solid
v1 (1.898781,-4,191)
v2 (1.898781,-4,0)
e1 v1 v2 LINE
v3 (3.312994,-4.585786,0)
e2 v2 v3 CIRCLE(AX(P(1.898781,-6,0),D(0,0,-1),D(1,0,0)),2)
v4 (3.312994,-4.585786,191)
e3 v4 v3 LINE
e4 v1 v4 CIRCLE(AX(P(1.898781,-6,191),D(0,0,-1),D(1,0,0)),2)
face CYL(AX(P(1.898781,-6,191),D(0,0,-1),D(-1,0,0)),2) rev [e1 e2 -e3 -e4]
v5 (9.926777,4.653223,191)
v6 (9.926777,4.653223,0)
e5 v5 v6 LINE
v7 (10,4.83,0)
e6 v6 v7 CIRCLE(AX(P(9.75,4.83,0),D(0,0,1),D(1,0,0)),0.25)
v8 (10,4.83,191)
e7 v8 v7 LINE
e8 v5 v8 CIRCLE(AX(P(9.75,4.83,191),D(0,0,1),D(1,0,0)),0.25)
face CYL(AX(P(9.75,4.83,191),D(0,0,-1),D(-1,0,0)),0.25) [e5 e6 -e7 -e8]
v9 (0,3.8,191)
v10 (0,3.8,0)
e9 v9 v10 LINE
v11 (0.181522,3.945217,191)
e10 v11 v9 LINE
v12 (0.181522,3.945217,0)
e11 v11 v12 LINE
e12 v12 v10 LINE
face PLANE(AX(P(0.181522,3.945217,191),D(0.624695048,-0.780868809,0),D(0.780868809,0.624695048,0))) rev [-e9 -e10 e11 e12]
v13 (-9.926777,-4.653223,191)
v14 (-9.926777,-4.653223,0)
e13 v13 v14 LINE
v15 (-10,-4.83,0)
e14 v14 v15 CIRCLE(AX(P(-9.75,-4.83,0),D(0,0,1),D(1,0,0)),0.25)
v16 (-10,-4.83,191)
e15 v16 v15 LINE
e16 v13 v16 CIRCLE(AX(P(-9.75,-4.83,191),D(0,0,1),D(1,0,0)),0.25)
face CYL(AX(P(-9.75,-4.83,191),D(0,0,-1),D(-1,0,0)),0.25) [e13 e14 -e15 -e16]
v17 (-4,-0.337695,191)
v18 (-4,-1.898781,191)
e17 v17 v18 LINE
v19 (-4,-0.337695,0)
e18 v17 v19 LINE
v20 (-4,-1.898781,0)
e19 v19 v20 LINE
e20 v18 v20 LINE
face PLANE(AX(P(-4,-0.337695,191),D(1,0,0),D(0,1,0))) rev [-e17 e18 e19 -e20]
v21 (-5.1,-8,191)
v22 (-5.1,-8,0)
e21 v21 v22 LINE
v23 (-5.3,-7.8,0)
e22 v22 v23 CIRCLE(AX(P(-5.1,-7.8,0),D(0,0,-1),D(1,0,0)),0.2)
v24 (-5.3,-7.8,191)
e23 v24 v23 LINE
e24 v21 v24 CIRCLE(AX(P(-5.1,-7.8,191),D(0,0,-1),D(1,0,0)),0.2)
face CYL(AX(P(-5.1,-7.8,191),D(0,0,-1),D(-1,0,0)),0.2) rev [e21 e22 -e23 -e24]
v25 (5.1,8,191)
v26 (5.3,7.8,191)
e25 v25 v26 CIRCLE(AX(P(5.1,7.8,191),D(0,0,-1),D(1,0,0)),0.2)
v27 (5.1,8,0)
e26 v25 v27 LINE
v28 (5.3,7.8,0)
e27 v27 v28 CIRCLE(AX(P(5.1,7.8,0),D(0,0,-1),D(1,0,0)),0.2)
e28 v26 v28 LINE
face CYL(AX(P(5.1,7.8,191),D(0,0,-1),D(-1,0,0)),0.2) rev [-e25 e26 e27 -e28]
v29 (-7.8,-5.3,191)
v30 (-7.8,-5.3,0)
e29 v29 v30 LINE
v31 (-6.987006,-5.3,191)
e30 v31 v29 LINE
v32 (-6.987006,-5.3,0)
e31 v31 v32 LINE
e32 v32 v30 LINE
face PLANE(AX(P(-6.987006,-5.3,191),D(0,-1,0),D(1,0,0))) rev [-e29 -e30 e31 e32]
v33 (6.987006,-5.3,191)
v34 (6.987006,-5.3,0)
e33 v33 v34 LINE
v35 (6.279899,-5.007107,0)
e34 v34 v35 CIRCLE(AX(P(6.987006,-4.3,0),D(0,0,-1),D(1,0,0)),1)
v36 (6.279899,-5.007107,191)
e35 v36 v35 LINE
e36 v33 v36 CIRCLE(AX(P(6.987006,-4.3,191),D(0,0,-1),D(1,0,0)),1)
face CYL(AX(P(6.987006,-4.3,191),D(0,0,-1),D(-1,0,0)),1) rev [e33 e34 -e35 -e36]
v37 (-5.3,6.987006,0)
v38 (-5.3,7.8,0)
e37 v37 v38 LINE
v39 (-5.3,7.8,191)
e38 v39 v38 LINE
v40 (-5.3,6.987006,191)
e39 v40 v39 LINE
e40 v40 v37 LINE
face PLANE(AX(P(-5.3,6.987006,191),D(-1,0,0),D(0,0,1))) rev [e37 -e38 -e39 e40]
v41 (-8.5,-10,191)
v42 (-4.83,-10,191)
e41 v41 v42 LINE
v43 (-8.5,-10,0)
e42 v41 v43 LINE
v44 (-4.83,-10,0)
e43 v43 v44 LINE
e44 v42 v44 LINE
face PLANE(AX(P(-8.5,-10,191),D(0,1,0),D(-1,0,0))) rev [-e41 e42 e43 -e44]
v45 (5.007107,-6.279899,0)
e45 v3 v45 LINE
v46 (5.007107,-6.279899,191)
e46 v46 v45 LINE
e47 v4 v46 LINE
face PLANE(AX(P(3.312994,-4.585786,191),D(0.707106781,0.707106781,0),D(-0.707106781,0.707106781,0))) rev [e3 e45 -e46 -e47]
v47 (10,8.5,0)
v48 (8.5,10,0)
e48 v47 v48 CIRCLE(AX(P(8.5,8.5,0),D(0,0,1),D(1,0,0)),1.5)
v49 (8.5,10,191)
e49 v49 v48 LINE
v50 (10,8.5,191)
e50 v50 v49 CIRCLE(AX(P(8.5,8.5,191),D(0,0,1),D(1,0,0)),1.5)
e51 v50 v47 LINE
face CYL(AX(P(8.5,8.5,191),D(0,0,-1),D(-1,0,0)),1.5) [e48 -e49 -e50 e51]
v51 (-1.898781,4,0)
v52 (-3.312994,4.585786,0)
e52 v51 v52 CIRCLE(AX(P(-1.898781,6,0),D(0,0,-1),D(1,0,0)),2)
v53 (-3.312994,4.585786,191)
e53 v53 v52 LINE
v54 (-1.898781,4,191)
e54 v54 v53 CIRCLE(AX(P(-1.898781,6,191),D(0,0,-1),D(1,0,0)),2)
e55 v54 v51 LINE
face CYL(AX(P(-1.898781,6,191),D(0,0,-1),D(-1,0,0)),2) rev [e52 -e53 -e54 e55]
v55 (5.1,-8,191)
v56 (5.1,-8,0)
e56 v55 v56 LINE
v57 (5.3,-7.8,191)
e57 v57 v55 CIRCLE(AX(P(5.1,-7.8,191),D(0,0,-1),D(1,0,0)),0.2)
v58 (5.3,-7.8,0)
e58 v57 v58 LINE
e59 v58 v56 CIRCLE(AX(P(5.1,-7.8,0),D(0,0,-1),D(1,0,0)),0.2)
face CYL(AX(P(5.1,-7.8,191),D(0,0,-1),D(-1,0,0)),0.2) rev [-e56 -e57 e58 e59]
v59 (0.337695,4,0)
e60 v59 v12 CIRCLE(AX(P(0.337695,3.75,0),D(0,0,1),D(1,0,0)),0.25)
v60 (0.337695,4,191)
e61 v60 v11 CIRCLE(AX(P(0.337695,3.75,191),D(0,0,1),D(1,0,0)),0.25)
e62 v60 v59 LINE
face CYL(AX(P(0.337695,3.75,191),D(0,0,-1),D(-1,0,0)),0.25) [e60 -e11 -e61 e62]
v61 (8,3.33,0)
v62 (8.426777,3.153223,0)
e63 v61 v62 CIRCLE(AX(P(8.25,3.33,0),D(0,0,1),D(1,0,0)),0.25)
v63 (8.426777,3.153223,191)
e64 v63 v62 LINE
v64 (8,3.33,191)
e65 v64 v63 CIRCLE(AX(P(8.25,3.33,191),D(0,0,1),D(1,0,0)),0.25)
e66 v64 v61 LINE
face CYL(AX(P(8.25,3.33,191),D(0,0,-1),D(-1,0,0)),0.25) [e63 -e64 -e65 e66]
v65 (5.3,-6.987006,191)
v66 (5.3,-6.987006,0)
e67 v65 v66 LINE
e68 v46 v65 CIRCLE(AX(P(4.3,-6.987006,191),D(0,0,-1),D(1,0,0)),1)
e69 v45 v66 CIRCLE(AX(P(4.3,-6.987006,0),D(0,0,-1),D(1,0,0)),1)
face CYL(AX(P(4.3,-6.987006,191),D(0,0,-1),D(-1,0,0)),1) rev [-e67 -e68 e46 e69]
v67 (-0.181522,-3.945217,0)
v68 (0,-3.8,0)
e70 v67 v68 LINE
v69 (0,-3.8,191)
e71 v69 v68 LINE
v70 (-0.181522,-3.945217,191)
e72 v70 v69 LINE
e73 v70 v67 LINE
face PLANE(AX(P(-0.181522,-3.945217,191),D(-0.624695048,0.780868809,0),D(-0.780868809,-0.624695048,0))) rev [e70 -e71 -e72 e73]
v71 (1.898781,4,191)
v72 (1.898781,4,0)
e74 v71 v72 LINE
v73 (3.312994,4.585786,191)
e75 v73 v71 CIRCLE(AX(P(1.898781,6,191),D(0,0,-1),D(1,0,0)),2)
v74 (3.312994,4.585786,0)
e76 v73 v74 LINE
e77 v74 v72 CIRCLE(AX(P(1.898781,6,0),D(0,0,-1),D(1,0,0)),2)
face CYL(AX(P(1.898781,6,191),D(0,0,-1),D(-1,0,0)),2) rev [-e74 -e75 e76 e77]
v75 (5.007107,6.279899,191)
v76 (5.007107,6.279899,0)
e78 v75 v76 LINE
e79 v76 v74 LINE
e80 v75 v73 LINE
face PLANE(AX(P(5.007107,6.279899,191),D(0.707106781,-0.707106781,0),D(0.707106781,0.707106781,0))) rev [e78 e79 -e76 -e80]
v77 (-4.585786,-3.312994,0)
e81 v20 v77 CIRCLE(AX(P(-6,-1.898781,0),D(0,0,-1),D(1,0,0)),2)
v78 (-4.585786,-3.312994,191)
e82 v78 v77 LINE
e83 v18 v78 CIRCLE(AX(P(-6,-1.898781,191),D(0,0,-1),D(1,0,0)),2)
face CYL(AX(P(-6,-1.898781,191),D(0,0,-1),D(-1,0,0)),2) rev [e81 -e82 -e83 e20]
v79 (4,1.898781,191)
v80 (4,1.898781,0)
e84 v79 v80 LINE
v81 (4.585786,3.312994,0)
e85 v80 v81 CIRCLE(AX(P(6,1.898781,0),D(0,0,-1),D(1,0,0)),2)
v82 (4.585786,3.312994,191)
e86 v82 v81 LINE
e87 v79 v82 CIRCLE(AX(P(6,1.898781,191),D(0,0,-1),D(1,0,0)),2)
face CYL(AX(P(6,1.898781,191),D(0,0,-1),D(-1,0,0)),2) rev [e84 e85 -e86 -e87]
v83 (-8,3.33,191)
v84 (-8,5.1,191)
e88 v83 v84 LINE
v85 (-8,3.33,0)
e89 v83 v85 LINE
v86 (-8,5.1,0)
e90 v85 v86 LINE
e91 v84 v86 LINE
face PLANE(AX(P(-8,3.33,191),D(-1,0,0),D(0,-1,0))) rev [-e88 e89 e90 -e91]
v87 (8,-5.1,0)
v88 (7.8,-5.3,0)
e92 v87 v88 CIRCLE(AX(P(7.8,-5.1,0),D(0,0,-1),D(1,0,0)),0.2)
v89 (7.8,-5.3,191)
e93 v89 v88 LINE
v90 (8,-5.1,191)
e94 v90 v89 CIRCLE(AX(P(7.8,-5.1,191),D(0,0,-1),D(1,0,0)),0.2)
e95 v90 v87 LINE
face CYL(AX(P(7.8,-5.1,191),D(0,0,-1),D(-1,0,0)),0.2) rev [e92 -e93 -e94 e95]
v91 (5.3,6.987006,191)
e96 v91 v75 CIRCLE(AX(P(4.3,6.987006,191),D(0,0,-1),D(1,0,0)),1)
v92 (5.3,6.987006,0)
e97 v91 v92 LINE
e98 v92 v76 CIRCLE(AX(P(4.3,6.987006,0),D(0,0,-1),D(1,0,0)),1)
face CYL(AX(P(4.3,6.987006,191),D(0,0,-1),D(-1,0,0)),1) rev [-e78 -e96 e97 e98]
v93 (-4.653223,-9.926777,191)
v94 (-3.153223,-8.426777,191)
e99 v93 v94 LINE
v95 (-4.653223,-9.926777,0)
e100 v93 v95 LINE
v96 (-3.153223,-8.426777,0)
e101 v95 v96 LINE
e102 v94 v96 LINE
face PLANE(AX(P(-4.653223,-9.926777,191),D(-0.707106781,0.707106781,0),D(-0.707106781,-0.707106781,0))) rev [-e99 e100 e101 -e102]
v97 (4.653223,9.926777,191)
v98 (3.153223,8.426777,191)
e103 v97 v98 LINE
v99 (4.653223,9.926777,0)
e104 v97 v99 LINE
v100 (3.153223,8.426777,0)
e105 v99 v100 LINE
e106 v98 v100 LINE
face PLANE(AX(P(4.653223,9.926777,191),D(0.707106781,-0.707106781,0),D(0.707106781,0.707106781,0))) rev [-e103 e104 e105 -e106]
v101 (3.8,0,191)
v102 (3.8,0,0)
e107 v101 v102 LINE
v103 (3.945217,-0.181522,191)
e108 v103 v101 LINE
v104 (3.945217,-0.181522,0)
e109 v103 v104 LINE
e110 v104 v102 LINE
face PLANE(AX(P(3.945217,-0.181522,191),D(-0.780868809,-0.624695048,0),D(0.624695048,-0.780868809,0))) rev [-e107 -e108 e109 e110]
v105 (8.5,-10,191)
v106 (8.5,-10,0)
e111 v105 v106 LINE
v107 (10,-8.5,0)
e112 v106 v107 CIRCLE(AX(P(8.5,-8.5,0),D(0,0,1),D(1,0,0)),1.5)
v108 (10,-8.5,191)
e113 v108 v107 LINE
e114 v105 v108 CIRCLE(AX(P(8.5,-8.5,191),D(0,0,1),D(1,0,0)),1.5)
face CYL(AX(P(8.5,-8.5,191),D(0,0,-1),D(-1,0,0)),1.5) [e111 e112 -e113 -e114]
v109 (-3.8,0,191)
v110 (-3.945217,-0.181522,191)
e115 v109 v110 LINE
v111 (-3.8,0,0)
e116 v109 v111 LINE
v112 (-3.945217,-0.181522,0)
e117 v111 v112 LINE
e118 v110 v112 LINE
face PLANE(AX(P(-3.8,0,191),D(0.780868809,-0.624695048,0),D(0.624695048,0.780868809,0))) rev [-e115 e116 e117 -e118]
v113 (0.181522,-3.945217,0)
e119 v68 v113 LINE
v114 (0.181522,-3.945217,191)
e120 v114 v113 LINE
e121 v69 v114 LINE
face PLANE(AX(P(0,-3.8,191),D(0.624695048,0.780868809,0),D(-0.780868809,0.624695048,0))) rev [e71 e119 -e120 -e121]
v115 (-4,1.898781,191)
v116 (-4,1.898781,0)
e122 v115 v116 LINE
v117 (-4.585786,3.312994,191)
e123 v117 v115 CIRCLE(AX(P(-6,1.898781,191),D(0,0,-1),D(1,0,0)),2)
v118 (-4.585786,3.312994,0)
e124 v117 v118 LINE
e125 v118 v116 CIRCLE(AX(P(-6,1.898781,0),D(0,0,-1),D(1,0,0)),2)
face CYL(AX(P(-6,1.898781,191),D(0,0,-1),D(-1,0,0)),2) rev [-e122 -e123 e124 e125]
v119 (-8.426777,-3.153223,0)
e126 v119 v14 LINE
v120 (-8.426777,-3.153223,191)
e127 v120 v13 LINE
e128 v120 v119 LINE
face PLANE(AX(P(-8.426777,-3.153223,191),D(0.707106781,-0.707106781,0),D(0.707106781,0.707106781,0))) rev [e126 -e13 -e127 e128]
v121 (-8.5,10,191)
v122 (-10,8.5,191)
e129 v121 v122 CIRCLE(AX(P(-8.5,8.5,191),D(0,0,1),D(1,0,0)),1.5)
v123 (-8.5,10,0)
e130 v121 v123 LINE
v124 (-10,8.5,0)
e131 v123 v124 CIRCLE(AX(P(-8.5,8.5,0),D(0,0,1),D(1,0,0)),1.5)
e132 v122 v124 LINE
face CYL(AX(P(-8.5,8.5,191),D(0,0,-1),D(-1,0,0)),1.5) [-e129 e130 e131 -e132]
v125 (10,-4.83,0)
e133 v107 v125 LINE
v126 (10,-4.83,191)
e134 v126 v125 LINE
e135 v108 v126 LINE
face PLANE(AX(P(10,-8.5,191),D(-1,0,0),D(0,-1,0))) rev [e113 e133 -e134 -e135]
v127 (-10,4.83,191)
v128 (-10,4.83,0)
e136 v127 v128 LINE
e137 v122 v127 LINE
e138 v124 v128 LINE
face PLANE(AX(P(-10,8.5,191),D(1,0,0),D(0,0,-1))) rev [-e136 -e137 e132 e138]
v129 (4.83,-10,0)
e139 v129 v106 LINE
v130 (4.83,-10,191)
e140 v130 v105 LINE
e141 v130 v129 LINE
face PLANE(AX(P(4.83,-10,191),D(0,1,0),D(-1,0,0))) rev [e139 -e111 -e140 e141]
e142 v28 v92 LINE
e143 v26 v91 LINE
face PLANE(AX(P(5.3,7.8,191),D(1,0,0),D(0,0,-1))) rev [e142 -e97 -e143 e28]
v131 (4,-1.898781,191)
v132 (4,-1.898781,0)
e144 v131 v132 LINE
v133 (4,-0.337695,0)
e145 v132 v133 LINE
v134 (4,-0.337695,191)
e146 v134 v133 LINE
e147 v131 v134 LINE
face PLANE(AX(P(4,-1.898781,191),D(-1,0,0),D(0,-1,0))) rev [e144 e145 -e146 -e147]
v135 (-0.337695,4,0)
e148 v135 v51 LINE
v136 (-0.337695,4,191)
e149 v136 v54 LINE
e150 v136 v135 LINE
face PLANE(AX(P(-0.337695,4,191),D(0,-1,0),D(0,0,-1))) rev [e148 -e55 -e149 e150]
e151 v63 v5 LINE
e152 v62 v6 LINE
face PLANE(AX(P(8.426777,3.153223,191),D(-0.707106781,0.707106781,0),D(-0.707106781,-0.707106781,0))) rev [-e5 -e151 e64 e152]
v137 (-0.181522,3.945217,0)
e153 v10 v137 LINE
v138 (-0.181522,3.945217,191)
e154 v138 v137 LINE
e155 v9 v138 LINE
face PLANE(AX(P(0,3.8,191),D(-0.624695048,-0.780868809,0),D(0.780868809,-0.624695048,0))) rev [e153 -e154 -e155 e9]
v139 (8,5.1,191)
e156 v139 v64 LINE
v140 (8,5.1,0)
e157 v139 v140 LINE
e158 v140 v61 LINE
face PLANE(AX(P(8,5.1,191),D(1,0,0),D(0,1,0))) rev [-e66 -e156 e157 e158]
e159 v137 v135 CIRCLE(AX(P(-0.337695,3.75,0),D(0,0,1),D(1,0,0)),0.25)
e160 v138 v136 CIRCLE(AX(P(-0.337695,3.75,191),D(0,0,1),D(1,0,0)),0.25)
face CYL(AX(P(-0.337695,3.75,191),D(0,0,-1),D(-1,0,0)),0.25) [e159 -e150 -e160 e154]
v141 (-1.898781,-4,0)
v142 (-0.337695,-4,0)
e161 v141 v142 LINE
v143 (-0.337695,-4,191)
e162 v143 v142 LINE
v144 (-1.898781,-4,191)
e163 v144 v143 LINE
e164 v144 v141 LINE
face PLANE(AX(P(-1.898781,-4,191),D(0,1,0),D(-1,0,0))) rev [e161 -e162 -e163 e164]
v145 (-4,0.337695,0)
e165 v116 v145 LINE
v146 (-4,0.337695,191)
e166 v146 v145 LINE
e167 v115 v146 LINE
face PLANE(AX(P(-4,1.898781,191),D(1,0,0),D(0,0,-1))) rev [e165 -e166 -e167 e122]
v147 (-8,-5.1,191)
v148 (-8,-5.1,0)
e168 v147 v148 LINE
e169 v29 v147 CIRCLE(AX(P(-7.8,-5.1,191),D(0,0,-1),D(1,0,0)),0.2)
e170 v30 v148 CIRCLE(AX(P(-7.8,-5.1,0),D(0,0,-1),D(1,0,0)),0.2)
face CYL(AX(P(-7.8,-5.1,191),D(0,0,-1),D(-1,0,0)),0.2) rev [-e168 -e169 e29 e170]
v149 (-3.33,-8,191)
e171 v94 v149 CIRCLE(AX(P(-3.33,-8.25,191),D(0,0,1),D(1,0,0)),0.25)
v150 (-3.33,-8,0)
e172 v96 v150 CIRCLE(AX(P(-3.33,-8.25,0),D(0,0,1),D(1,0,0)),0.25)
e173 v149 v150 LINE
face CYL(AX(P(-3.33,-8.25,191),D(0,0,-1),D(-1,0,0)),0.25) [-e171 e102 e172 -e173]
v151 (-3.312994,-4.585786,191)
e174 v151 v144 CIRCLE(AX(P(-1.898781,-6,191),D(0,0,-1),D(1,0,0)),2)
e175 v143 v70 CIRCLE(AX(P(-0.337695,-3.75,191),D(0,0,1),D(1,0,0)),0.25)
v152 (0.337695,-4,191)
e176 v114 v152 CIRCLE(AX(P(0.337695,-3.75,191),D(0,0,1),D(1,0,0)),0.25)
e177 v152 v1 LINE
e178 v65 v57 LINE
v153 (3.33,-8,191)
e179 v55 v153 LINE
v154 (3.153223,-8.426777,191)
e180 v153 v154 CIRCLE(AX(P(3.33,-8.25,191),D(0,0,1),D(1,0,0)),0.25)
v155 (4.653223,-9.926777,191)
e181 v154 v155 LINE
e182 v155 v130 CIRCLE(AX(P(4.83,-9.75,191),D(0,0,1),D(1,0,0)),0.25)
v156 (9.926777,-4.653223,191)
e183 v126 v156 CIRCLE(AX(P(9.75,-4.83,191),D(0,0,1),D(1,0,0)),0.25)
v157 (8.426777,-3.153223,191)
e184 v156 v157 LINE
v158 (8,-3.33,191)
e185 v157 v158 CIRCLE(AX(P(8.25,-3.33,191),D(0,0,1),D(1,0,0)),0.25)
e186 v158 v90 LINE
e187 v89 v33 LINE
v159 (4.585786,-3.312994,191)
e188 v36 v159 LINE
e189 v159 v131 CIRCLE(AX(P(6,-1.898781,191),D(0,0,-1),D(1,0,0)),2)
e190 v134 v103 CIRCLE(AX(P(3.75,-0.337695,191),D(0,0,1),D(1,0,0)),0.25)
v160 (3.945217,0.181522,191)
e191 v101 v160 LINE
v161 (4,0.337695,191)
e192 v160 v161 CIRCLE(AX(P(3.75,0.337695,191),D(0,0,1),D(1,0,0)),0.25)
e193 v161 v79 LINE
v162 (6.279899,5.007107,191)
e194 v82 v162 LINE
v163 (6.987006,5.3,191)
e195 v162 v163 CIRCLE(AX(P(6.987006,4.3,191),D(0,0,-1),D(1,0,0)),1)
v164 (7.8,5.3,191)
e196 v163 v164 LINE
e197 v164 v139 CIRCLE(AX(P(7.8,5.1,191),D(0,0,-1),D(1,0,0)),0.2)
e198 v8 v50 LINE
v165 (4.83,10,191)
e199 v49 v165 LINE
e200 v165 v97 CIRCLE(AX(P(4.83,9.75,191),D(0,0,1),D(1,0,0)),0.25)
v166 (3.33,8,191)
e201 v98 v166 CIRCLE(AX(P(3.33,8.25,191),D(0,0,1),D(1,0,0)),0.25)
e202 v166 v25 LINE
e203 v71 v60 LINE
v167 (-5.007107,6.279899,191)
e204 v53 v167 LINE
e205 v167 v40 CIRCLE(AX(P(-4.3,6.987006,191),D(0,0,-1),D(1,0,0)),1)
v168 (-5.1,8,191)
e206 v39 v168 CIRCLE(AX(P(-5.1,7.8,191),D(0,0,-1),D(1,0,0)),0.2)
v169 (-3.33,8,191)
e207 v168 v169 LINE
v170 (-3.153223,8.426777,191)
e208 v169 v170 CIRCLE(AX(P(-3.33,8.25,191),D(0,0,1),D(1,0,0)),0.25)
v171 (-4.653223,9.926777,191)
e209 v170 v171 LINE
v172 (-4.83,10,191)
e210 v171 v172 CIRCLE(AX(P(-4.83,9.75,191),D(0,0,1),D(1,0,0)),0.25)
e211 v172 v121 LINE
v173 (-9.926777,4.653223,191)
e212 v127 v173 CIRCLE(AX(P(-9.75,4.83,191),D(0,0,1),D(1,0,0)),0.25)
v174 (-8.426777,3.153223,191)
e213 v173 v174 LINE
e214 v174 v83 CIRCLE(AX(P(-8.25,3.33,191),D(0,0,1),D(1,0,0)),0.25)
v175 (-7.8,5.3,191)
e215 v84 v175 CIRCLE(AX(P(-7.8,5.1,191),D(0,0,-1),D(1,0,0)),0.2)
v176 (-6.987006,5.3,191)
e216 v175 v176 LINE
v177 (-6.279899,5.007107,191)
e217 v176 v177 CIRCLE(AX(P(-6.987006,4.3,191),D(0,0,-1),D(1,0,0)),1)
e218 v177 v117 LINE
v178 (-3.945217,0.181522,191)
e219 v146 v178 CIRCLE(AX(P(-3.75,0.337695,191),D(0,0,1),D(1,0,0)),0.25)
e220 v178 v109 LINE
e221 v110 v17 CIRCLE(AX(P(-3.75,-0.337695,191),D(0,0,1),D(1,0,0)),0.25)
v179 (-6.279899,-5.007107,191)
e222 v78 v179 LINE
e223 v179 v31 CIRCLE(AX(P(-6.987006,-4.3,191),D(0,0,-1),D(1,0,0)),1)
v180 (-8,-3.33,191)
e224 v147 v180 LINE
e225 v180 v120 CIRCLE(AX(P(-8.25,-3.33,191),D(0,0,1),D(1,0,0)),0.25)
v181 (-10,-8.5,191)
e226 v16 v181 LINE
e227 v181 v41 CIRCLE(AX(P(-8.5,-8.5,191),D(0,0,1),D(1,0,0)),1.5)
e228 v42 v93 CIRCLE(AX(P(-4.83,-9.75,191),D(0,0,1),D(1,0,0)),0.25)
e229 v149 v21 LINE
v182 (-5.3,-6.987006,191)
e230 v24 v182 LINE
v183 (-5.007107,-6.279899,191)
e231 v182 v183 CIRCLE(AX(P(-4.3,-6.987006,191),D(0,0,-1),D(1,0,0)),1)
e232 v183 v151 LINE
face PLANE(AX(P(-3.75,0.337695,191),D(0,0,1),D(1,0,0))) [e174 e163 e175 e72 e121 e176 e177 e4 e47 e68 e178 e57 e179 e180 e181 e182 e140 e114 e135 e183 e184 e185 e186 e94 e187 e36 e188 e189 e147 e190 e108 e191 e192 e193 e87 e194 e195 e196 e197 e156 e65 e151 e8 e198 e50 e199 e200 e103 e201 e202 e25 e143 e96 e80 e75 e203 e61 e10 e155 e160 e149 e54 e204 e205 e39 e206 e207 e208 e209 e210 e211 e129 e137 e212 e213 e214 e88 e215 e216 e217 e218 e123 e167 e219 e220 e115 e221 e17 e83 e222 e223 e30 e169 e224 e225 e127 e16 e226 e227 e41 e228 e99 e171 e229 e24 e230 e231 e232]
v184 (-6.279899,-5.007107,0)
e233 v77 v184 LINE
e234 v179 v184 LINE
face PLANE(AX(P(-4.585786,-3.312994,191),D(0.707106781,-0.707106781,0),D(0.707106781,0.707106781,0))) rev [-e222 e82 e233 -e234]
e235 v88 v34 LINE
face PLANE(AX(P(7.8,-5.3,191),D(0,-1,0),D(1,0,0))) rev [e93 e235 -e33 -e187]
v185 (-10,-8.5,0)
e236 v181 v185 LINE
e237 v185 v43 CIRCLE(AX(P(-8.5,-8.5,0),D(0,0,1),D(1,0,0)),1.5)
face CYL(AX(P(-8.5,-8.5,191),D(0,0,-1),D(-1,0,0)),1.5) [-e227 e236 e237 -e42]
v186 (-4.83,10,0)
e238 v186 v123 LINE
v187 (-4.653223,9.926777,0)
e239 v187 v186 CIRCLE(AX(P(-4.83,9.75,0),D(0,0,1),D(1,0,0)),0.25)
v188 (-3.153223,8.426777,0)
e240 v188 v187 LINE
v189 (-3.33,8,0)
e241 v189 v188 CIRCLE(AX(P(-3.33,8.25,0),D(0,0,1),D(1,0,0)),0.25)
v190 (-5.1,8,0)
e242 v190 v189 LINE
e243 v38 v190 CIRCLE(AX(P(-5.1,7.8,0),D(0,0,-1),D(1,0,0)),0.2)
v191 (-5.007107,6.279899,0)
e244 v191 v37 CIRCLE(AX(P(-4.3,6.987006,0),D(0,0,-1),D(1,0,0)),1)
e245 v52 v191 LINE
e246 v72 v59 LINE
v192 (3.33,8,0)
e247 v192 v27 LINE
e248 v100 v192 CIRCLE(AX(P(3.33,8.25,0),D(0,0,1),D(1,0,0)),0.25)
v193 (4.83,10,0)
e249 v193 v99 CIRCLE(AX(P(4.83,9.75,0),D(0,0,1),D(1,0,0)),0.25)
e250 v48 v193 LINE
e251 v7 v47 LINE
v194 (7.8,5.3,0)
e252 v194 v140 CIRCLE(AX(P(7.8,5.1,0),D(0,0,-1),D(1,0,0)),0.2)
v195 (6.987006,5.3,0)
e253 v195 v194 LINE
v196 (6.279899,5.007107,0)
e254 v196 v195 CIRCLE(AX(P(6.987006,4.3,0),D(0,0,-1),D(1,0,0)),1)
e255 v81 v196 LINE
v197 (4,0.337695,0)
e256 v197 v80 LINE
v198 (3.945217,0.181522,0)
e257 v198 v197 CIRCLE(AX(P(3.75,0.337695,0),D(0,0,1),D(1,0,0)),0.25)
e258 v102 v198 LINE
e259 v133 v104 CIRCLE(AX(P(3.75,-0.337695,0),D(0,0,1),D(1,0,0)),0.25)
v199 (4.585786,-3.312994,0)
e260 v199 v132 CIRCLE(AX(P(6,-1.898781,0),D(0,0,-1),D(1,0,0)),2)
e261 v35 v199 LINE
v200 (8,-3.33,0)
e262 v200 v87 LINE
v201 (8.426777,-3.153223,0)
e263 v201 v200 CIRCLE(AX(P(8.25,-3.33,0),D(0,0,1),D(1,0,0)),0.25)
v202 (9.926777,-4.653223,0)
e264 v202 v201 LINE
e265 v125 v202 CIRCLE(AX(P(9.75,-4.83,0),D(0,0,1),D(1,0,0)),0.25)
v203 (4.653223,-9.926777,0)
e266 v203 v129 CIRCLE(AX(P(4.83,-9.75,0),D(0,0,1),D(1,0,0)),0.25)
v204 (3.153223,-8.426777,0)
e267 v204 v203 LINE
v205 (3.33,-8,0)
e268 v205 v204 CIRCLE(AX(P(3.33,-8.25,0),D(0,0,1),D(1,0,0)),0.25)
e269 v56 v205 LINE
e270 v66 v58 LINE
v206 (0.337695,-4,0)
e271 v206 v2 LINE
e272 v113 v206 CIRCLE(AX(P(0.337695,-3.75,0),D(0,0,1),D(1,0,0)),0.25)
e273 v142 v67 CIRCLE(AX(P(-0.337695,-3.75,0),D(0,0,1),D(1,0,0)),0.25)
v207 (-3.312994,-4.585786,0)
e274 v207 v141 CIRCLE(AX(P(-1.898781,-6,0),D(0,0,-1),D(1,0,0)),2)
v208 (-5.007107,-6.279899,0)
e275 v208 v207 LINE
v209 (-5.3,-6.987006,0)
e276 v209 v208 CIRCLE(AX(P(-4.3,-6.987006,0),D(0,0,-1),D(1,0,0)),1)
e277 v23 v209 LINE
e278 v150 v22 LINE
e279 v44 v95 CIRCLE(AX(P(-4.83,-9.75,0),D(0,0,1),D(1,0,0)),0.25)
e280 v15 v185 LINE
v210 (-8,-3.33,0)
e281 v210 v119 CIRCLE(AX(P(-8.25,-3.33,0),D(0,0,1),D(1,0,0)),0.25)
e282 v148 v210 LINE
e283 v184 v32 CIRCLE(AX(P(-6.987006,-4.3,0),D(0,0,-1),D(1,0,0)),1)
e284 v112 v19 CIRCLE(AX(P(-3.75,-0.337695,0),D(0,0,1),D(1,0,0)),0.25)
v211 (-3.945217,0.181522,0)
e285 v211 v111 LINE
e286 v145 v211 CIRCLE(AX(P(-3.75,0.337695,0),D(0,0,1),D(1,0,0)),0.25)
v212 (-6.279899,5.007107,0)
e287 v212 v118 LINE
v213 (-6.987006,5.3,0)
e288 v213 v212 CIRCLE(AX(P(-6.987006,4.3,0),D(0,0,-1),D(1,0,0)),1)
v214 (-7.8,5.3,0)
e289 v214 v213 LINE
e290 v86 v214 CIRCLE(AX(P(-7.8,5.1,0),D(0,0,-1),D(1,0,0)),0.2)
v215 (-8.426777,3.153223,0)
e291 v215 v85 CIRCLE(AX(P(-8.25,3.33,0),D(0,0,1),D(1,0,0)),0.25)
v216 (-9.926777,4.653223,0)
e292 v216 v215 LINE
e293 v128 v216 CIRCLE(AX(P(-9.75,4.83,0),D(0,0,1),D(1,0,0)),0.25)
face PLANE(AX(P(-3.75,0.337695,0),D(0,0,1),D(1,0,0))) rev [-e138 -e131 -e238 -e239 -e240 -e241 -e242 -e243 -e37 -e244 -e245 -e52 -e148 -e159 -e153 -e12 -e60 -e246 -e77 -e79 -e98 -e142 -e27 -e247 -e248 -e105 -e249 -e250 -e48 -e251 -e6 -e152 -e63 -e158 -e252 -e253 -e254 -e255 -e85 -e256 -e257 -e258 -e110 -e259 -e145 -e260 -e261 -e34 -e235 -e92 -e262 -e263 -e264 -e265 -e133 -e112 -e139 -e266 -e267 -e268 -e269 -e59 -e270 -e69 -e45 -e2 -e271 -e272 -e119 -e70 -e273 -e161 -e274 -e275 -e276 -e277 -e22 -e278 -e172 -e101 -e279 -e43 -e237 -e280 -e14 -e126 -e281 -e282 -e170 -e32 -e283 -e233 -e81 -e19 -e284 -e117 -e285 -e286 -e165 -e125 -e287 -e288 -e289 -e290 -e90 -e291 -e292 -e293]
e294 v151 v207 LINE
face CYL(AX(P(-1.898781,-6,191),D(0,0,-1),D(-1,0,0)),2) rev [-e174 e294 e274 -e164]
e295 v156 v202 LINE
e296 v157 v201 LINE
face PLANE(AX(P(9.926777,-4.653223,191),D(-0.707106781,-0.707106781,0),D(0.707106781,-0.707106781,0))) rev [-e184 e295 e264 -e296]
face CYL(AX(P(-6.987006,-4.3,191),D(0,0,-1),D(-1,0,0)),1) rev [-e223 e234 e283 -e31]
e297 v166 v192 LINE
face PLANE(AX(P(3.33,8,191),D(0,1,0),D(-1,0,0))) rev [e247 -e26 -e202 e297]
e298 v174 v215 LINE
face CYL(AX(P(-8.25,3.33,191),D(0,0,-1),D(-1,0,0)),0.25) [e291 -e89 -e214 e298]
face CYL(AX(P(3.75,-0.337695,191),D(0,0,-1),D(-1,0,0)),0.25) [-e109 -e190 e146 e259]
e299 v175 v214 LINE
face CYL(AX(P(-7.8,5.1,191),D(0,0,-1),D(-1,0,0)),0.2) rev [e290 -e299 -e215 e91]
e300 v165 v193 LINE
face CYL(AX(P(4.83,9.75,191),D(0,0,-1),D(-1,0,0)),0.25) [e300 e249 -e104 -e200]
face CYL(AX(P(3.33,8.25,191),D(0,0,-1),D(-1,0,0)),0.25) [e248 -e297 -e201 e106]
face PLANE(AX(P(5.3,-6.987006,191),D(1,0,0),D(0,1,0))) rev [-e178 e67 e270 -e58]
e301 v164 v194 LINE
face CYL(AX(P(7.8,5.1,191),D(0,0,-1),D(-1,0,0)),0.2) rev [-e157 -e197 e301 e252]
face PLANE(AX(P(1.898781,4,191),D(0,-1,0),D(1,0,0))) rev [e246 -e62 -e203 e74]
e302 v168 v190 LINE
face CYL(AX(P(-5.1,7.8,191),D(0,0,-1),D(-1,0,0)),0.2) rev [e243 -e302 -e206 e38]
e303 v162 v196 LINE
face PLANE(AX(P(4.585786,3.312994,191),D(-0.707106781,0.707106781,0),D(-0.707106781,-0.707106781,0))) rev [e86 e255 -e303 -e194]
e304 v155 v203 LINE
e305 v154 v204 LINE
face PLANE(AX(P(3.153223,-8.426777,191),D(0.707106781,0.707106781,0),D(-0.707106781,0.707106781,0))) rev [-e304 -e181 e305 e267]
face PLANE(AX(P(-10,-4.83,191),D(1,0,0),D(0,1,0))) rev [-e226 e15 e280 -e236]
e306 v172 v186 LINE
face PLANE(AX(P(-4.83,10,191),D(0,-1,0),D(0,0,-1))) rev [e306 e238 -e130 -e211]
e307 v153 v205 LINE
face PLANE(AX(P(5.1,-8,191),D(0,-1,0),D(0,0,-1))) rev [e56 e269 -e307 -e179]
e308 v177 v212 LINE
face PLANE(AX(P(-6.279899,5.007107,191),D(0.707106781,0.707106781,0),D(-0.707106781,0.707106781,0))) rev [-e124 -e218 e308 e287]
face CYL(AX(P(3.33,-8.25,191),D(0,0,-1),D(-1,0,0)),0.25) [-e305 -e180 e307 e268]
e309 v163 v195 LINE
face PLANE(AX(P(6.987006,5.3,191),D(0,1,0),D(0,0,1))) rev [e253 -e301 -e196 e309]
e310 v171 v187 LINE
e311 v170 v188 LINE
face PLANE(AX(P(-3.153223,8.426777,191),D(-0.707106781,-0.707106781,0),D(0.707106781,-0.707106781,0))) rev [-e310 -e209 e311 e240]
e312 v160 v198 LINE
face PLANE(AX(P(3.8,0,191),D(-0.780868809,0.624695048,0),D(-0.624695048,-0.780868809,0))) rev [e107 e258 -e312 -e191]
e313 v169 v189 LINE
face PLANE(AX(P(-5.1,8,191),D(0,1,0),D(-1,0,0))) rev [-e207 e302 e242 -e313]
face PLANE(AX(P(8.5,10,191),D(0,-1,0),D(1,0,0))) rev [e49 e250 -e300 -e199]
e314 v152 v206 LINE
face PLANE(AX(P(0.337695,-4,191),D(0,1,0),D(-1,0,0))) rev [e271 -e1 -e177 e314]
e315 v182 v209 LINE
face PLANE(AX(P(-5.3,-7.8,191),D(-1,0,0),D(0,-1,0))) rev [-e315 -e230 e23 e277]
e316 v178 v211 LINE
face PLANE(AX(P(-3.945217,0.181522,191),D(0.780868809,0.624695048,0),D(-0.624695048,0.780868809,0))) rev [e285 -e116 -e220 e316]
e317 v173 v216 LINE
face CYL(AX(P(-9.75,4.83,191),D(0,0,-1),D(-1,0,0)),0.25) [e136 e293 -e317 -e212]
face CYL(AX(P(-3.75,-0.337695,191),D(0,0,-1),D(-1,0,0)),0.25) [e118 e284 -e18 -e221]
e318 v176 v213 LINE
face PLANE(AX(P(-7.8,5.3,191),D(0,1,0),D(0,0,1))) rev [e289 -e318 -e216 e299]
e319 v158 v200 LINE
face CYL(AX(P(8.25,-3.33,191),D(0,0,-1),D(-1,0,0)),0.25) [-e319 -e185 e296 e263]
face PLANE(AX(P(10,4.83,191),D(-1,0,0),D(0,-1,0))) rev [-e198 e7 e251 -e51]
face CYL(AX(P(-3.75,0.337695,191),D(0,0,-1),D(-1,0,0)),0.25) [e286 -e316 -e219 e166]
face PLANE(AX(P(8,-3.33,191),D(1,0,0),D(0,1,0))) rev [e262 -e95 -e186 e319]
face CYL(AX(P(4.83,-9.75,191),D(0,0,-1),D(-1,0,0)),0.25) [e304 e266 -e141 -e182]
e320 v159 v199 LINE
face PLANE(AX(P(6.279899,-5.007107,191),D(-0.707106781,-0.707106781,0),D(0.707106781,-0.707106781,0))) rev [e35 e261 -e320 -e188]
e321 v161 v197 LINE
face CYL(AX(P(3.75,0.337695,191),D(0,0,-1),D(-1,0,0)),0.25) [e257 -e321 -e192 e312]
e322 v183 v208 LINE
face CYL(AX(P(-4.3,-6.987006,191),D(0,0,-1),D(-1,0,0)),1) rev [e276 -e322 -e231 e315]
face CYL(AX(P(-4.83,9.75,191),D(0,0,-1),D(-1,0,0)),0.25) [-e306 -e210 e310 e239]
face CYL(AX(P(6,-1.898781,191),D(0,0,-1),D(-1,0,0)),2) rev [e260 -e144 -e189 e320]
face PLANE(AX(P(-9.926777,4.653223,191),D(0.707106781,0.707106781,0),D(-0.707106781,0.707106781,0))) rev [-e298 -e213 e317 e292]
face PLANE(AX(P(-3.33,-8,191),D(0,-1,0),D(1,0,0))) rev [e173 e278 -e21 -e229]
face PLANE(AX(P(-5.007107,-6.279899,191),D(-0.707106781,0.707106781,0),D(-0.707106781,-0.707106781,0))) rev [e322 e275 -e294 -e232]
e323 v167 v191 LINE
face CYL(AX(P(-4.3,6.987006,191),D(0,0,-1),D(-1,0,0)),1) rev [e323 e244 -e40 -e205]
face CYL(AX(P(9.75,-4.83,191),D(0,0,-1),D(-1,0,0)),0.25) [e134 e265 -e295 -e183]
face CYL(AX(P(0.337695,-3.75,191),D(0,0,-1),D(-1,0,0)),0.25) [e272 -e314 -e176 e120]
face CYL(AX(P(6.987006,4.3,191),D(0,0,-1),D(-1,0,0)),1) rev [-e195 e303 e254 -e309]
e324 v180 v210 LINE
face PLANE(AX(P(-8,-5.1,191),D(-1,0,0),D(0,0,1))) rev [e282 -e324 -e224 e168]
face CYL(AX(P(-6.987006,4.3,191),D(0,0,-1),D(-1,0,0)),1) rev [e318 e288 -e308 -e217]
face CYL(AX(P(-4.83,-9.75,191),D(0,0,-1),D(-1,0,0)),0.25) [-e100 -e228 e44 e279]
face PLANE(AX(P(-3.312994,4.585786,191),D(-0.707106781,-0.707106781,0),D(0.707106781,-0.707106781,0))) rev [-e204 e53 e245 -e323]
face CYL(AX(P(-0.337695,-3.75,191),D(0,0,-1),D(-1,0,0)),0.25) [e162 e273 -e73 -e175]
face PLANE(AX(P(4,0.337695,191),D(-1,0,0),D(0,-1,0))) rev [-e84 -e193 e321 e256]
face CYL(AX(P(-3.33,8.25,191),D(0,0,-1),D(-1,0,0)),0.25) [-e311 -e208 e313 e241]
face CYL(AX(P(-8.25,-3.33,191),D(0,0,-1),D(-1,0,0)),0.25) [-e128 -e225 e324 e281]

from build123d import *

# Parameters (mm, degrees)
EXTRUDE_1_DEPTH = 191


# Read off the part's stored shape, not the designer's step: 222 Конструкционный профиль 20х20-1-surface1
with BuildPart() as part:
    # Эскиз1 → Бобышка-Вытянуть1 (new body)
    with BuildSketch(Plane.XY):
        with BuildLine():
            Line((-3.945217202, 0.181521503), (-3.8, 0))
            Line((-3.8, 0), (-3.945217202, -0.181521503))
            ThreePointArc((-3.945217202, -0.181521503), (-3.98590708, -0.254943529), (-4, -0.337695265))
            Line((-4, -0.337695265), (-4, -1.898780669))
            ThreePointArc((-4, -1.898780669), (-4.152240935, -2.664147534), (-4.585786438, -3.312994231))
            Line((-4.585786438, -3.312994231), (-6.279898987, -5.007106781))
            ThreePointArc((-6.279898987, -5.007106781), (-6.604322336, -5.223879533), (-6.987005769, -5.3))
            Line((-6.987005769, -5.3), (-7.8, -5.3))
            ThreePointArc((-7.8, -5.3), (-7.941421356, -5.241421356), (-8, -5.1))
            Line((-8, -5.1), (-8, -3.33))
            ThreePointArc((-8, -3.33), (-8.154329142, -3.099030117), (-8.426776695, -3.153223305))
            Line((-8.426776695, -3.153223305), (-9.926776695, -4.653223305))
            ThreePointArc((-9.926776695, -4.653223305), (-9.980969883, -4.734329142), (-10, -4.83))
            Line((-10, -4.83), (-10, -8.5))
            ThreePointArc((-10, -8.5), (-9.560660172, -9.560660172), (-8.5, -10))
            Line((-8.5, -10), (-4.83, -10))
            ThreePointArc((-4.83, -10), (-4.734329142, -9.980969883), (-4.653223305, -9.926776695))
            Line((-4.653223305, -9.926776695), (-3.153223305, -8.426776695))
            ThreePointArc((-3.153223305, -8.426776695), (-3.099030117, -8.154329142), (-3.33, -8))
            Line((-3.33, -8), (-5.1, -8))
            ThreePointArc((-5.1, -8), (-5.241421356, -7.941421356), (-5.3, -7.8))
            Line((-5.3, -7.8), (-5.3, -6.987005769))
            ThreePointArc((-5.3, -6.987005769), (-5.223879533, -6.604322336), (-5.007106781, -6.279898987))
            Line((-5.007106781, -6.279898987), (-3.312994231, -4.585786438))
            ThreePointArc((-3.312994231, -4.585786438), (-2.664147534, -4.152240935), (-1.898780669, -4))
            Line((-1.898780669, -4), (-0.337695265, -4))
            ThreePointArc((-0.337695265, -4), (-0.254943529, -3.98590708), (-0.181521503, -3.945217202))
            Line((-0.181521503, -3.945217202), (0, -3.8))
            Line((0, -3.8), (0.181521503, -3.945217202))
            ThreePointArc((0.181521503, -3.945217202), (0.254943529, -3.98590708), (0.337695265, -4))
            Line((0.337695265, -4), (1.898780669, -4))
            ThreePointArc((1.898780669, -4), (2.664147534, -4.152240935), (3.312994231, -4.585786438))
            Line((3.312994231, -4.585786438), (5.007106781, -6.279898987))
            ThreePointArc((5.007106781, -6.279898987), (5.223879533, -6.604322336), (5.3, -6.987005769))
            Line((5.3, -6.987005769), (5.3, -7.8))
            ThreePointArc((5.3, -7.8), (5.241421356, -7.941421356), (5.1, -8))
            Line((5.1, -8), (3.33, -8))
            ThreePointArc((3.33, -8), (3.099030117, -8.154329142), (3.153223305, -8.426776695))
            Line((3.153223305, -8.426776695), (4.653223305, -9.926776695))
            ThreePointArc((4.653223305, -9.926776695), (4.734329142, -9.980969883), (4.83, -10))
            Line((4.83, -10), (8.5, -10))
            ThreePointArc((8.5, -10), (9.560660172, -9.560660172), (10, -8.5))
            Line((10, -8.5), (10, -4.83))
            ThreePointArc((10, -4.83), (9.980969883, -4.734329142), (9.926776695, -4.653223305))
            Line((9.926776695, -4.653223305), (8.426776695, -3.153223305))
            ThreePointArc((8.426776695, -3.153223305), (8.154329142, -3.099030117), (8, -3.33))
            Line((8, -3.33), (8, -5.1))
            ThreePointArc((8, -5.1), (7.941421356, -5.241421356), (7.8, -5.3))
            Line((7.8, -5.3), (6.987005769, -5.3))
            ThreePointArc((6.987005769, -5.3), (6.604322336, -5.223879533), (6.279898987, -5.007106781))
            Line((6.279898987, -5.007106781), (4.585786438, -3.312994231))
            ThreePointArc((4.585786438, -3.312994231), (4.152240935, -2.664147534), (4, -1.898780669))
            Line((4, -1.898780669), (4, -0.337695265))
            ThreePointArc((4, -0.337695265), (3.98590708, -0.254943529), (3.945217202, -0.181521503))
            Line((3.945217202, -0.181521503), (3.8, 0))
            Line((3.8, 0), (3.945217202, 0.181521503))
            ThreePointArc((3.945217202, 0.181521503), (3.98590708, 0.254943529), (4, 0.337695265))
            Line((4, 0.337695265), (4, 1.898780669))
            ThreePointArc((4, 1.898780669), (4.152240935, 2.664147534), (4.585786438, 3.312994231))
            Line((4.585786438, 3.312994231), (6.279898987, 5.007106781))
            ThreePointArc((6.279898987, 5.007106781), (6.604322336, 5.223879533), (6.987005769, 5.3))
            Line((6.987005769, 5.3), (7.8, 5.3))
            ThreePointArc((7.8, 5.3), (7.941421356, 5.241421356), (8, 5.1))
            Line((8, 5.1), (8, 3.33))
            ThreePointArc((8, 3.33), (8.154329142, 3.099030117), (8.426776695, 3.153223305))
            Line((8.426776695, 3.153223305), (9.926776695, 4.653223305))
            ThreePointArc((9.926776695, 4.653223305), (9.980969883, 4.734329142), (10, 4.83))
            Line((10, 4.83), (10, 8.5))
            ThreePointArc((10, 8.5), (9.560660172, 9.560660172), (8.5, 10))
            Line((8.5, 10), (4.83, 10))
            ThreePointArc((4.83, 10), (4.734329142, 9.980969883), (4.653223305, 9.926776695))
            Line((4.653223305, 9.926776695), (3.153223305, 8.426776695))
            ThreePointArc((3.153223305, 8.426776695), (3.099030117, 8.154329142), (3.33, 8))
            Line((3.33, 8), (5.1, 8))
            ThreePointArc((5.1, 8), (5.241421356, 7.941421356), (5.3, 7.8))
            Line((5.3, 7.8), (5.3, 6.987005769))
            ThreePointArc((5.3, 6.987005769), (5.223879533, 6.604322336), (5.007106781, 6.279898987))
            Line((5.007106781, 6.279898987), (3.312994231, 4.585786438))
            ThreePointArc((3.312994231, 4.585786438), (2.664147534, 4.152240935), (1.898780669, 4))
            Line((1.898780669, 4), (0.337695265, 4))
            ThreePointArc((0.337695265, 4), (0.254943529, 3.98590708), (0.181521503, 3.945217202))
            Line((0.181521503, 3.945217202), (0, 3.8))
            Line((0, 3.8), (-0.181521503, 3.945217202))
            ThreePointArc((-0.181521503, 3.945217202), (-0.254943529, 3.98590708), (-0.337695265, 4))
            Line((-0.337695265, 4), (-1.898780669, 4))
            ThreePointArc((-1.898780669, 4), (-2.664147534, 4.152240935), (-3.312994231, 4.585786438))
            Line((-3.312994231, 4.585786438), (-5.007106781, 6.279898987))
            ThreePointArc((-5.007106781, 6.279898987), (-5.223879533, 6.604322336), (-5.3, 6.987005769))
            Line((-5.3, 6.987005769), (-5.3, 7.8))
            ThreePointArc((-5.3, 7.8), (-5.241421356, 7.941421356), (-5.1, 8))
            Line((-5.1, 8), (-3.33, 8))
            ThreePointArc((-3.33, 8), (-3.099030117, 8.154329142), (-3.153223305, 8.426776695))
            Line((-3.153223305, 8.426776695), (-4.653223305, 9.926776695))
            ThreePointArc((-4.653223305, 9.926776695), (-4.734329142, 9.980969883), (-4.83, 10))
            Line((-4.83, 10), (-8.5, 10))
            ThreePointArc((-8.5, 10), (-9.560660172, 9.560660172), (-10, 8.5))
            Line((-10, 8.5), (-10, 4.83))
            ThreePointArc((-10, 4.83), (-9.980969883, 4.734329142), (-9.926776695, 4.653223305))
            Line((-9.926776695, 4.653223305), (-8.426776695, 3.153223305))
            ThreePointArc((-8.426776695, 3.153223305), (-8.154329142, 3.099030117), (-8, 3.33))
            Line((-8, 3.33), (-8, 5.1))
            ThreePointArc((-8, 5.1), (-7.941421356, 5.241421356), (-7.8, 5.3))
            Line((-7.8, 5.3), (-6.987005769, 5.3))
            ThreePointArc((-6.987005769, 5.3), (-6.604322336, 5.223879533), (-6.279898987, 5.007106781))
            Line((-6.279898987, 5.007106781), (-4.585786438, 3.312994231))
            ThreePointArc((-4.585786438, 3.312994231), (-4.152240935, 2.664147534), (-4, 1.898780669))
            Line((-4, 1.898780669), (-4, 0.337695265))
            ThreePointArc((-4, 0.337695265), (-3.98590708, 0.254943529), (-3.945217202, 0.181521503))
        make_face()
    extrude(amount=EXTRUDE_1_DEPTH)


solid = part.part
